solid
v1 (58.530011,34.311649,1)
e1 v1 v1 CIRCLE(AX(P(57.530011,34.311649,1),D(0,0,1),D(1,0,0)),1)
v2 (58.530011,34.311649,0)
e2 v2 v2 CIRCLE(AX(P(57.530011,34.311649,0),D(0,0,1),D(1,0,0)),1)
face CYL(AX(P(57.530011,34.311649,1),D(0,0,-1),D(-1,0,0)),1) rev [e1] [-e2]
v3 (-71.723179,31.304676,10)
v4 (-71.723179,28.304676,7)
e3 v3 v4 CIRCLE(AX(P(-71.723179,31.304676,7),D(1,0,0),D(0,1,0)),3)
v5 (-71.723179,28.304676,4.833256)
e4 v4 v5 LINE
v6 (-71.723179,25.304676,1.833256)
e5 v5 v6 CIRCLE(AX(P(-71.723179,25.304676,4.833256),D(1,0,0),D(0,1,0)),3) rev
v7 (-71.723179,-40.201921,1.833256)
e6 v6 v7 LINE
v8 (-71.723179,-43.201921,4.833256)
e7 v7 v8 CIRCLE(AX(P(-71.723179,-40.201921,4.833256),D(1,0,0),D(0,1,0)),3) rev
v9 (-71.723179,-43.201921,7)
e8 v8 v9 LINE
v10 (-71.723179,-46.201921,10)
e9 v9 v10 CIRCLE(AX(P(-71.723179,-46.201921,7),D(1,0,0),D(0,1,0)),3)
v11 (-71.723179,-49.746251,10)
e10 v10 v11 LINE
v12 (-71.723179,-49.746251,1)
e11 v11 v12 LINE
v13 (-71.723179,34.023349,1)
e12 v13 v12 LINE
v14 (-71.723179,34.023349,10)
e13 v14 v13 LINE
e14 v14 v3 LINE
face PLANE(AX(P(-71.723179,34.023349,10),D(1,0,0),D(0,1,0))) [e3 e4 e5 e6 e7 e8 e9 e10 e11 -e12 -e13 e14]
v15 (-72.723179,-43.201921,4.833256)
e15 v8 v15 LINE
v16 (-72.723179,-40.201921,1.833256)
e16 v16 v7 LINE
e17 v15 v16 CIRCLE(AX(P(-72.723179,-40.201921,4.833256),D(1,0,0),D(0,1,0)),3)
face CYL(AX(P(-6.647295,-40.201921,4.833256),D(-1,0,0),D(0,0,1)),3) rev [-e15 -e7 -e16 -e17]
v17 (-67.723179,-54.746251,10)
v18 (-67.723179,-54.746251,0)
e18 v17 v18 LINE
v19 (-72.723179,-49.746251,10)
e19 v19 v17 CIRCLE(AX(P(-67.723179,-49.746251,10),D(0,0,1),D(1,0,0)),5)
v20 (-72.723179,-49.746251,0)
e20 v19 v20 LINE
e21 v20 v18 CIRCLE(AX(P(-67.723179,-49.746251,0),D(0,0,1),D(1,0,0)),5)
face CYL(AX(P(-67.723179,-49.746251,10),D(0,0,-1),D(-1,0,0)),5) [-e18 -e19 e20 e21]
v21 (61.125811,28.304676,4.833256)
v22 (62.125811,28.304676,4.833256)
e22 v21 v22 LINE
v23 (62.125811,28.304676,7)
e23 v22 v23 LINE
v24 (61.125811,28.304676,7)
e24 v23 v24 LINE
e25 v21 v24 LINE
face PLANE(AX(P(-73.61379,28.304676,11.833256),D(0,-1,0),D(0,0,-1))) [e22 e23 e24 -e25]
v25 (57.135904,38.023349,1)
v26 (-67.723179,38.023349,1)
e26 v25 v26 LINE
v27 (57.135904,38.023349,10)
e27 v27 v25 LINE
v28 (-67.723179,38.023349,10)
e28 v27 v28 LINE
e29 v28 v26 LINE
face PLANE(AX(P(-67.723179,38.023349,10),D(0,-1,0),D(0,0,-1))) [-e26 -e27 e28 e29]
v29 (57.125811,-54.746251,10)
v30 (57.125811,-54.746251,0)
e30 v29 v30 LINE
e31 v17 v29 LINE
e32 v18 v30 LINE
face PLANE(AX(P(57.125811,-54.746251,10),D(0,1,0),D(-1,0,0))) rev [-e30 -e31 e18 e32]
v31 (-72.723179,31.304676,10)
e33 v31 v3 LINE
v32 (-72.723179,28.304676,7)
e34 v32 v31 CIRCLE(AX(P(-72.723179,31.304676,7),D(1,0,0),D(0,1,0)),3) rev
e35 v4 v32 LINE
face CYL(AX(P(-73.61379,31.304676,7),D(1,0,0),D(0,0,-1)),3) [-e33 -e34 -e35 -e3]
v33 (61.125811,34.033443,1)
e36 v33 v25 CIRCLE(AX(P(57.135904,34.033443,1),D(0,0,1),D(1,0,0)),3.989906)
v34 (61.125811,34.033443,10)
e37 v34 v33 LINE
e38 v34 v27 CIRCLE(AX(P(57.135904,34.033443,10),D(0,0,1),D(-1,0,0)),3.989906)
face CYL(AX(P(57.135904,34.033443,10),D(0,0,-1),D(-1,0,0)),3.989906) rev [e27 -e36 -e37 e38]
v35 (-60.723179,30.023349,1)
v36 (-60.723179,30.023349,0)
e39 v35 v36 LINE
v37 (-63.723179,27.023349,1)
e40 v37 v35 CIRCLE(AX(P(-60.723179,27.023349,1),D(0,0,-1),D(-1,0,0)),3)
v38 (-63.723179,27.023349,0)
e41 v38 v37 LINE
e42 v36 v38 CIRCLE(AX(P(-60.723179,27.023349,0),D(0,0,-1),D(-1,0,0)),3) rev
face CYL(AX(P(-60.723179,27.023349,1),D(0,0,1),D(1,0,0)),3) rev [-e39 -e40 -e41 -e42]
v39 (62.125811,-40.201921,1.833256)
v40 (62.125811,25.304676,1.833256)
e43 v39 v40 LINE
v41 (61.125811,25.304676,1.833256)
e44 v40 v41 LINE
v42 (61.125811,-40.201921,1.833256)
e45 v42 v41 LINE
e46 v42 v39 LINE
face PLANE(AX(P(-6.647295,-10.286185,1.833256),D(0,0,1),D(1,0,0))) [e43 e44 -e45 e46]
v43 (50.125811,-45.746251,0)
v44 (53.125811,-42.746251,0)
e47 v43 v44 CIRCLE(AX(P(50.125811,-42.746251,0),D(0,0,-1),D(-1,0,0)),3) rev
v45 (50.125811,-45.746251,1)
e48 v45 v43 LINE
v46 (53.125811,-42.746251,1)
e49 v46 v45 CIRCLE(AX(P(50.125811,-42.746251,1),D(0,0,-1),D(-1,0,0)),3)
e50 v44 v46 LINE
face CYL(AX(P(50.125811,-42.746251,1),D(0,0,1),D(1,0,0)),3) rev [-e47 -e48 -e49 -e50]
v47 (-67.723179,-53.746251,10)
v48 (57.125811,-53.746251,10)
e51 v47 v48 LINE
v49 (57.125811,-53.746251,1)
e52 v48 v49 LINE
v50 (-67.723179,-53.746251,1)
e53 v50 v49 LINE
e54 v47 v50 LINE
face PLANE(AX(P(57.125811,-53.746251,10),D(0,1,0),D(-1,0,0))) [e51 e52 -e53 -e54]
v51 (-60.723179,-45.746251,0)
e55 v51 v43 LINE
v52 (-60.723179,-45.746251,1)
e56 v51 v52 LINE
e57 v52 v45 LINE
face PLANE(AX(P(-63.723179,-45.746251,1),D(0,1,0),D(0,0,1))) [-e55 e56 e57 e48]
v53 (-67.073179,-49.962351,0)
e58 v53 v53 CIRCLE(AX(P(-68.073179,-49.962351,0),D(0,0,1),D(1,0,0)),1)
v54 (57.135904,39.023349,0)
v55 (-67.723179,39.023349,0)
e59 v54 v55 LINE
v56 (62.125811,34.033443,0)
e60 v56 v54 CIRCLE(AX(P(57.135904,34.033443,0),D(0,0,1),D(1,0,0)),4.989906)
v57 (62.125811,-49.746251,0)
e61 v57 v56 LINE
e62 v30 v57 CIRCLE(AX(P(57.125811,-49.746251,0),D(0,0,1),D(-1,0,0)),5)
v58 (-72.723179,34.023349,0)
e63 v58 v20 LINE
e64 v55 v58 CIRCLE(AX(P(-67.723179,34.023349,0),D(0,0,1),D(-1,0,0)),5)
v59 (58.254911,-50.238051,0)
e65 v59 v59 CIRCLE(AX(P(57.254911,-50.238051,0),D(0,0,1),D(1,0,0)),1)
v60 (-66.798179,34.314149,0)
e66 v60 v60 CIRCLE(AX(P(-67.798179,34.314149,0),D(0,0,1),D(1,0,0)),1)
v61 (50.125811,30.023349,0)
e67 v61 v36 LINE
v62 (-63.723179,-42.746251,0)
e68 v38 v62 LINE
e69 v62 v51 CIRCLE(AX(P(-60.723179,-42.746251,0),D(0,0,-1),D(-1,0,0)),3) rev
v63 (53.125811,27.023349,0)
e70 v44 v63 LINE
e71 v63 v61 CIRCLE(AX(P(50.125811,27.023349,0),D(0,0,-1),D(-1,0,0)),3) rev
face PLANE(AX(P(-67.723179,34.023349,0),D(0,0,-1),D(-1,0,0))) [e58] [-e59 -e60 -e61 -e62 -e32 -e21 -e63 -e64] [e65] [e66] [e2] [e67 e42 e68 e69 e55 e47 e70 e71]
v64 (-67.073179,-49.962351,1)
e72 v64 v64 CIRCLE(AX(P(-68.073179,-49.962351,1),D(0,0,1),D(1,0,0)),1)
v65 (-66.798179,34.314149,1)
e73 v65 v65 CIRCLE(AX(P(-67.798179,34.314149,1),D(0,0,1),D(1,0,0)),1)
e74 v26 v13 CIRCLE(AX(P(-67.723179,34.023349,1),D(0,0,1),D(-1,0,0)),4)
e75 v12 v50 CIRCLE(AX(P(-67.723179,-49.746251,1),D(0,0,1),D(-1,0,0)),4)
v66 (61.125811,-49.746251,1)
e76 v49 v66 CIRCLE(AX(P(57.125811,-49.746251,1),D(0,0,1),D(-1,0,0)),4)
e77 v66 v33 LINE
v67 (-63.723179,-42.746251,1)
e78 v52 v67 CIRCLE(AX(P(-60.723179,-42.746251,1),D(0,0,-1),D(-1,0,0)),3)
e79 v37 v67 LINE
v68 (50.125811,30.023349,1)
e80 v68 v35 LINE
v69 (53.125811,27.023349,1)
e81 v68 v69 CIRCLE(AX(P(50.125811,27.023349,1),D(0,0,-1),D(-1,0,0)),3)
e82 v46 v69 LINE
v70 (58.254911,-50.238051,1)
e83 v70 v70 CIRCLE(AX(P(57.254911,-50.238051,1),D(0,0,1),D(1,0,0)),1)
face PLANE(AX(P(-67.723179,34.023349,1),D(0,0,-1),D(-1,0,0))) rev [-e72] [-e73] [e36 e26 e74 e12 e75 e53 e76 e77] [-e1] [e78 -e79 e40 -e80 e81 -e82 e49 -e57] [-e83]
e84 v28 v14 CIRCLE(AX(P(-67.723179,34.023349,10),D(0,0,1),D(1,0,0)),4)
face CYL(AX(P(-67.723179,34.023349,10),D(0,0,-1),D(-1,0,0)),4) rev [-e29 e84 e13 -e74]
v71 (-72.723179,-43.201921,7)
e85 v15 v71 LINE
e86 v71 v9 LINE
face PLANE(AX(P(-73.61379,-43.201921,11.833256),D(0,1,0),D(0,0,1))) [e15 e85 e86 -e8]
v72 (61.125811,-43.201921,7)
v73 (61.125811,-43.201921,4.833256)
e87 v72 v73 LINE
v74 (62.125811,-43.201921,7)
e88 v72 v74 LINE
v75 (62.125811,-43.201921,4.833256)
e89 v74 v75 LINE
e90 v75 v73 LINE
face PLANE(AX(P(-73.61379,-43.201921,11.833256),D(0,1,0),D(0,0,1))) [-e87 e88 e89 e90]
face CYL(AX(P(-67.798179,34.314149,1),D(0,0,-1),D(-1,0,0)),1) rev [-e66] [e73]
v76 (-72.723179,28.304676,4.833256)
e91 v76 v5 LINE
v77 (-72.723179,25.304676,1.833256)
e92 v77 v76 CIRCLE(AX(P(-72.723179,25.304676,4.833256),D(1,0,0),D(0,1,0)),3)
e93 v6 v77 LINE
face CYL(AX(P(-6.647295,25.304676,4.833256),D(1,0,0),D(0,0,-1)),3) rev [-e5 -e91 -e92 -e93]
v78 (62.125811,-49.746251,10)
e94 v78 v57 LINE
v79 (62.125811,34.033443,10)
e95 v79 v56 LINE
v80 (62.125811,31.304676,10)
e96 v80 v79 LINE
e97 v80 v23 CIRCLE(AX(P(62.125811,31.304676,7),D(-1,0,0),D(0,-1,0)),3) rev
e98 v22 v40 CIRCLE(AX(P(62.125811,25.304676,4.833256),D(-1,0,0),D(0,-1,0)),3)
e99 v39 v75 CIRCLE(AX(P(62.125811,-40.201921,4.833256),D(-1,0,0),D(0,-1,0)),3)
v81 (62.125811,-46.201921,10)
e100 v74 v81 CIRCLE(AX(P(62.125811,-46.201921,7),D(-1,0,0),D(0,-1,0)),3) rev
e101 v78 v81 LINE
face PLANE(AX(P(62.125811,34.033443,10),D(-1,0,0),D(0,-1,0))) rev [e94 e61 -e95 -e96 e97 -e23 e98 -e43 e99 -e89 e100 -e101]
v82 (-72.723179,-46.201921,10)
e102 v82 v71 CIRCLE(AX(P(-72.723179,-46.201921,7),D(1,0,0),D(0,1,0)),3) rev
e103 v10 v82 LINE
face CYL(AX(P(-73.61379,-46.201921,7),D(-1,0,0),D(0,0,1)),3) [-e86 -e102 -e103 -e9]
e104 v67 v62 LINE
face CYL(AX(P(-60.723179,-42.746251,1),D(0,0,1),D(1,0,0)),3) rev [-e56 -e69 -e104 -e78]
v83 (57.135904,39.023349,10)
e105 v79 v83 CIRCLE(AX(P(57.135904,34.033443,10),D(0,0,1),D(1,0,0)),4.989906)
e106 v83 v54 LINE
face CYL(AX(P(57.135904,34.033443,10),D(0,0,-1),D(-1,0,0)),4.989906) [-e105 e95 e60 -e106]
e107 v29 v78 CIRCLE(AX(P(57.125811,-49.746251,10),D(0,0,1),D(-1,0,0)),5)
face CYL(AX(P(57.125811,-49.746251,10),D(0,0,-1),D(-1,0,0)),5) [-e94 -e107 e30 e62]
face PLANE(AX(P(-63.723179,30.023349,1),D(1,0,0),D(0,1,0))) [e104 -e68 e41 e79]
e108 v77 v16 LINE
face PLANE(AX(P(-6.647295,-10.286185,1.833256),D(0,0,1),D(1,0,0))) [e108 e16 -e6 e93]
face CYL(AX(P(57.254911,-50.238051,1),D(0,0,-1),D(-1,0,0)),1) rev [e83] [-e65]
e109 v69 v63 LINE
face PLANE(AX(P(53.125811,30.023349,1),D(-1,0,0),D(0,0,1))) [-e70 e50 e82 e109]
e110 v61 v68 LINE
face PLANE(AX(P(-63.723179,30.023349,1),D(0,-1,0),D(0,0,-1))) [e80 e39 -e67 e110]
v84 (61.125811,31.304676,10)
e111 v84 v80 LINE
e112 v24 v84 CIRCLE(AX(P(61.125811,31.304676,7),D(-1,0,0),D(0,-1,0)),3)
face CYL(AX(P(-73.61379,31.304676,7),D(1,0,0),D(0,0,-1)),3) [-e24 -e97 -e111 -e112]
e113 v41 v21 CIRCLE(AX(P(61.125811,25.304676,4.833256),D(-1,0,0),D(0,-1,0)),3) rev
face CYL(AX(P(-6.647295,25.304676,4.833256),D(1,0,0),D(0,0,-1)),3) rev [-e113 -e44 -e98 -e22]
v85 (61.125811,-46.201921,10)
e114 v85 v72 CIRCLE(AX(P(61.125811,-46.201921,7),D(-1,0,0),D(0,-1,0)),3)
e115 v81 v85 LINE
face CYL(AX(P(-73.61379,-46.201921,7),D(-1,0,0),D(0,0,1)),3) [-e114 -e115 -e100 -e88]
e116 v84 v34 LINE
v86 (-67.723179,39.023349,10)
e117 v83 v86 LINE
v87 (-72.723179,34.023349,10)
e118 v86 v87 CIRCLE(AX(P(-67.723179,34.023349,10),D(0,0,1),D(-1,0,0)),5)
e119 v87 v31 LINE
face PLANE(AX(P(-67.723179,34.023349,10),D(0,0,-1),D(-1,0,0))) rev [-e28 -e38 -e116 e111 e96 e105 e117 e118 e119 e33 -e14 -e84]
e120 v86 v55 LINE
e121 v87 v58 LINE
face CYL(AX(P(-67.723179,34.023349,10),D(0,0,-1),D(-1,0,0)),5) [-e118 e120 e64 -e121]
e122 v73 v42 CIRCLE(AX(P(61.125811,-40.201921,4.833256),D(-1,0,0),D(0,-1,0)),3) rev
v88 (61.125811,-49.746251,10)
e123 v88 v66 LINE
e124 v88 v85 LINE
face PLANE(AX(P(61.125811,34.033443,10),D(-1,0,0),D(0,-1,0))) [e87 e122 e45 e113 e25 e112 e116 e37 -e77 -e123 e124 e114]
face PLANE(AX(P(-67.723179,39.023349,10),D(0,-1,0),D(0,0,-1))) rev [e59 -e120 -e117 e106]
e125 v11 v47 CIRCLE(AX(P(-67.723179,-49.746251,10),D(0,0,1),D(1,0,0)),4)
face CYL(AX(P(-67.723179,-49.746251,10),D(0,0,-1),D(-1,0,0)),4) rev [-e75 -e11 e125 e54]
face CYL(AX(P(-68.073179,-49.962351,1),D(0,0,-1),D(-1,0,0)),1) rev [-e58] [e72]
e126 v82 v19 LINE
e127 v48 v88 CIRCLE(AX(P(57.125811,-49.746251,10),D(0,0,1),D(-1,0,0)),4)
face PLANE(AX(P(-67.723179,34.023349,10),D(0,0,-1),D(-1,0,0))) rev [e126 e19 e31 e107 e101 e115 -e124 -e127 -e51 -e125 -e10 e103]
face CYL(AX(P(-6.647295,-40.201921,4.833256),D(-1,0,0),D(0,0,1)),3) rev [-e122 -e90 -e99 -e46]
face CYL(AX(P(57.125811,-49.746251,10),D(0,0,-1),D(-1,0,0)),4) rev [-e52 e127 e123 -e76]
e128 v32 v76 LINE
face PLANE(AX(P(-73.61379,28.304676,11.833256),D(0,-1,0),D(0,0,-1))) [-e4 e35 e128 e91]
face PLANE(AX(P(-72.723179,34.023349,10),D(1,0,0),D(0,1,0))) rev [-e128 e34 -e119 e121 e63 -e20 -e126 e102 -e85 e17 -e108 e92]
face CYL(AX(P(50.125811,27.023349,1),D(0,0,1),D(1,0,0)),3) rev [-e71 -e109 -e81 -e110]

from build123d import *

# Parameters (mm, degrees)
BOSS_EXTRUDE1_DEPTH = 10
SKETCH2_R           = 1
SKETCH2_W           = 116.84899
SKETCH2_H           = 75.7696
BOSS_EXTRUDE2_DEPTH = 1
CAVITY1_START       = 1.833256049
CAVITY1_OUTLINE_W   = 1
CAVITY1_OUTLINE_H   = 71.506597146
CAVITY1_DEPTH       = 8.166743951
FILLET1_R           = 3
FILLET2_R           = 3
FILLET3_R           = 3


# Read off the part's stored shape, not the designer's step: Cavity1
with BuildPart() as part:
    # Sketch1 → Boss-Extrude1 (new body)
    with BuildSketch(Plane.XY):
        with BuildLine():
            Line((-67.723179308, 39.023349276), (57.135904391, 39.023349276))
            ThreePointArc((57.135904391, 39.023349276), (60.664300974, 37.561839558), (62.125810692, 34.033442975))
            Line((62.125810692, 34.033442975), (62.125810692, -49.746250724))
            ThreePointArc((62.125810692, -49.746250724), (60.661344598, -53.28178463), (57.125810692, -54.746250724))
            Line((57.125810692, -54.746250724), (-67.723179308, -54.746250724))
            ThreePointArc((-67.723179308, -54.746250724), (-71.258713213, -53.28178463), (-72.723179308, -49.746250724))
            Line((-72.723179308, -49.746250724), (-72.723179308, 34.023349276))
            ThreePointArc((-72.723179308, 34.023349276), (-71.258713213, 37.558883182), (-67.723179308, 39.023349276))
        make_face()
        with BuildLine():
            Line((-67.723179308, 38.023349276), (57.135904391, 38.023349276))
            ThreePointArc((57.135904391, 38.023349276), (59.957194193, 36.854732777), (61.125810692, 34.033442975))
            Line((61.125810692, 34.033442975), (61.125810692, -49.746250724))
            ThreePointArc((61.125810692, -49.746250724), (59.954237817, -52.574677849), (57.125810692, -53.746250724))
            Line((57.125810692, -53.746250724), (-67.723179308, -53.746250724))
            ThreePointArc((-67.723179308, -53.746250724), (-70.551606432, -52.574677849), (-71.723179308, -49.746250724))
            Line((-71.723179308, -49.746250724), (-71.723179308, 34.023349276))
            ThreePointArc((-71.723179308, 34.023349276), (-70.551606432, 36.851776401), (-67.723179308, 38.023349276))
        make_face(mode=Mode.SUBTRACT)
    extrude(amount=BOSS_EXTRUDE1_DEPTH)

    # Sketch2 → Boss-Extrude2 (add)
    with BuildSketch(Plane.XY):
        with BuildLine():
            Line((-67.723179308, 38.023349276), (57.135904391, 38.023349276))
            ThreePointArc((57.135904391, 38.023349276), (59.957194193, 36.854732777), (61.125810692, 34.033442975))
            Line((61.125810692, 34.033442975), (61.125810692, -49.746250724))
            ThreePointArc((61.125810692, -49.746250724), (59.954237817, -52.574677849), (57.125810692, -53.746250724))
            Line((57.125810692, -53.746250724), (-67.723179308, -53.746250724))
            ThreePointArc((-67.723179308, -53.746250724), (-70.551606432, -52.574677849), (-71.723179308, -49.746250724))
            Line((-71.723179308, -49.746250724), (-71.723179308, 34.023349276))
            ThreePointArc((-71.723179308, 34.023349276), (-70.551606432, 36.851776401), (-67.723179308, 38.023349276))
        make_face()
        with Locations((-67.798179308, 34.314149276)):
            Circle(SKETCH2_R, mode=Mode.SUBTRACT)
        with Locations((-68.073179308, -49.962350724)):
            Circle(SKETCH2_R, mode=Mode.SUBTRACT)
        with Locations((57.254910692, -50.238050724)):
            Circle(SKETCH2_R, mode=Mode.SUBTRACT)
        with Locations((57.530010692, 34.311649276)):
            Circle(SKETCH2_R, mode=Mode.SUBTRACT)
        with Locations((-5.298684308, -7.861450724)):
            Rectangle(SKETCH2_W, SKETCH2_H, mode=Mode.SUBTRACT)
    extrude(amount=BOSS_EXTRUDE2_DEPTH)

    # Cavity1 outline → Cavity1 (cut)
    with BuildSketch(Plane.XY.offset(CAVITY1_START)):
        with Locations((61.625810692, -7.448622115)):
            Rectangle(CAVITY1_OUTLINE_W, CAVITY1_OUTLINE_H)
        with Locations((-72.223179308, -7.448622115)):
            Rectangle(CAVITY1_OUTLINE_W, CAVITY1_OUTLINE_H)
    extrude(amount=CAVITY1_DEPTH, mode=Mode.SUBTRACT)

    # Fillet1
    fillet1_edges = [part.edges().sort_by_distance(p)[0] for p in [
        (61.625810692, -43.201920688, 10),
        (-72.223179308, -43.201920688, 10),
        (-72.223179308, 28.304676458, 10),
        (61.625810692, 28.304676458, 10),
    ]]
    fillet(fillet1_edges, radius=FILLET1_R)

    # Fillet2
    fillet2_edges = [part.edges().sort_by_distance(p)[0] for p in [
        (-72.223179308, -43.201920688, 1.833256049),
        (-72.223179308, 28.304676458, 1.833256049),
        (61.625810692, -43.201920688, 1.833256049),
        (61.625810692, 28.304676458, 1.833256049),
    ]]
    fillet(fillet2_edges, radius=FILLET2_R)

    # Fillet3
    fillet3_edges = [part.edges().sort_by_distance(p)[0] for p in [
        (-63.723179308, -45.746250724, 0.5),
        (53.125810692, -45.746250724, 0.5),
        (53.125810692, 30.023349276, 0.5),
        (-63.723179308, 30.023349276, 0.5),
    ]]
    fillet(fillet3_edges, radius=FILLET3_R)


solid = part.part
